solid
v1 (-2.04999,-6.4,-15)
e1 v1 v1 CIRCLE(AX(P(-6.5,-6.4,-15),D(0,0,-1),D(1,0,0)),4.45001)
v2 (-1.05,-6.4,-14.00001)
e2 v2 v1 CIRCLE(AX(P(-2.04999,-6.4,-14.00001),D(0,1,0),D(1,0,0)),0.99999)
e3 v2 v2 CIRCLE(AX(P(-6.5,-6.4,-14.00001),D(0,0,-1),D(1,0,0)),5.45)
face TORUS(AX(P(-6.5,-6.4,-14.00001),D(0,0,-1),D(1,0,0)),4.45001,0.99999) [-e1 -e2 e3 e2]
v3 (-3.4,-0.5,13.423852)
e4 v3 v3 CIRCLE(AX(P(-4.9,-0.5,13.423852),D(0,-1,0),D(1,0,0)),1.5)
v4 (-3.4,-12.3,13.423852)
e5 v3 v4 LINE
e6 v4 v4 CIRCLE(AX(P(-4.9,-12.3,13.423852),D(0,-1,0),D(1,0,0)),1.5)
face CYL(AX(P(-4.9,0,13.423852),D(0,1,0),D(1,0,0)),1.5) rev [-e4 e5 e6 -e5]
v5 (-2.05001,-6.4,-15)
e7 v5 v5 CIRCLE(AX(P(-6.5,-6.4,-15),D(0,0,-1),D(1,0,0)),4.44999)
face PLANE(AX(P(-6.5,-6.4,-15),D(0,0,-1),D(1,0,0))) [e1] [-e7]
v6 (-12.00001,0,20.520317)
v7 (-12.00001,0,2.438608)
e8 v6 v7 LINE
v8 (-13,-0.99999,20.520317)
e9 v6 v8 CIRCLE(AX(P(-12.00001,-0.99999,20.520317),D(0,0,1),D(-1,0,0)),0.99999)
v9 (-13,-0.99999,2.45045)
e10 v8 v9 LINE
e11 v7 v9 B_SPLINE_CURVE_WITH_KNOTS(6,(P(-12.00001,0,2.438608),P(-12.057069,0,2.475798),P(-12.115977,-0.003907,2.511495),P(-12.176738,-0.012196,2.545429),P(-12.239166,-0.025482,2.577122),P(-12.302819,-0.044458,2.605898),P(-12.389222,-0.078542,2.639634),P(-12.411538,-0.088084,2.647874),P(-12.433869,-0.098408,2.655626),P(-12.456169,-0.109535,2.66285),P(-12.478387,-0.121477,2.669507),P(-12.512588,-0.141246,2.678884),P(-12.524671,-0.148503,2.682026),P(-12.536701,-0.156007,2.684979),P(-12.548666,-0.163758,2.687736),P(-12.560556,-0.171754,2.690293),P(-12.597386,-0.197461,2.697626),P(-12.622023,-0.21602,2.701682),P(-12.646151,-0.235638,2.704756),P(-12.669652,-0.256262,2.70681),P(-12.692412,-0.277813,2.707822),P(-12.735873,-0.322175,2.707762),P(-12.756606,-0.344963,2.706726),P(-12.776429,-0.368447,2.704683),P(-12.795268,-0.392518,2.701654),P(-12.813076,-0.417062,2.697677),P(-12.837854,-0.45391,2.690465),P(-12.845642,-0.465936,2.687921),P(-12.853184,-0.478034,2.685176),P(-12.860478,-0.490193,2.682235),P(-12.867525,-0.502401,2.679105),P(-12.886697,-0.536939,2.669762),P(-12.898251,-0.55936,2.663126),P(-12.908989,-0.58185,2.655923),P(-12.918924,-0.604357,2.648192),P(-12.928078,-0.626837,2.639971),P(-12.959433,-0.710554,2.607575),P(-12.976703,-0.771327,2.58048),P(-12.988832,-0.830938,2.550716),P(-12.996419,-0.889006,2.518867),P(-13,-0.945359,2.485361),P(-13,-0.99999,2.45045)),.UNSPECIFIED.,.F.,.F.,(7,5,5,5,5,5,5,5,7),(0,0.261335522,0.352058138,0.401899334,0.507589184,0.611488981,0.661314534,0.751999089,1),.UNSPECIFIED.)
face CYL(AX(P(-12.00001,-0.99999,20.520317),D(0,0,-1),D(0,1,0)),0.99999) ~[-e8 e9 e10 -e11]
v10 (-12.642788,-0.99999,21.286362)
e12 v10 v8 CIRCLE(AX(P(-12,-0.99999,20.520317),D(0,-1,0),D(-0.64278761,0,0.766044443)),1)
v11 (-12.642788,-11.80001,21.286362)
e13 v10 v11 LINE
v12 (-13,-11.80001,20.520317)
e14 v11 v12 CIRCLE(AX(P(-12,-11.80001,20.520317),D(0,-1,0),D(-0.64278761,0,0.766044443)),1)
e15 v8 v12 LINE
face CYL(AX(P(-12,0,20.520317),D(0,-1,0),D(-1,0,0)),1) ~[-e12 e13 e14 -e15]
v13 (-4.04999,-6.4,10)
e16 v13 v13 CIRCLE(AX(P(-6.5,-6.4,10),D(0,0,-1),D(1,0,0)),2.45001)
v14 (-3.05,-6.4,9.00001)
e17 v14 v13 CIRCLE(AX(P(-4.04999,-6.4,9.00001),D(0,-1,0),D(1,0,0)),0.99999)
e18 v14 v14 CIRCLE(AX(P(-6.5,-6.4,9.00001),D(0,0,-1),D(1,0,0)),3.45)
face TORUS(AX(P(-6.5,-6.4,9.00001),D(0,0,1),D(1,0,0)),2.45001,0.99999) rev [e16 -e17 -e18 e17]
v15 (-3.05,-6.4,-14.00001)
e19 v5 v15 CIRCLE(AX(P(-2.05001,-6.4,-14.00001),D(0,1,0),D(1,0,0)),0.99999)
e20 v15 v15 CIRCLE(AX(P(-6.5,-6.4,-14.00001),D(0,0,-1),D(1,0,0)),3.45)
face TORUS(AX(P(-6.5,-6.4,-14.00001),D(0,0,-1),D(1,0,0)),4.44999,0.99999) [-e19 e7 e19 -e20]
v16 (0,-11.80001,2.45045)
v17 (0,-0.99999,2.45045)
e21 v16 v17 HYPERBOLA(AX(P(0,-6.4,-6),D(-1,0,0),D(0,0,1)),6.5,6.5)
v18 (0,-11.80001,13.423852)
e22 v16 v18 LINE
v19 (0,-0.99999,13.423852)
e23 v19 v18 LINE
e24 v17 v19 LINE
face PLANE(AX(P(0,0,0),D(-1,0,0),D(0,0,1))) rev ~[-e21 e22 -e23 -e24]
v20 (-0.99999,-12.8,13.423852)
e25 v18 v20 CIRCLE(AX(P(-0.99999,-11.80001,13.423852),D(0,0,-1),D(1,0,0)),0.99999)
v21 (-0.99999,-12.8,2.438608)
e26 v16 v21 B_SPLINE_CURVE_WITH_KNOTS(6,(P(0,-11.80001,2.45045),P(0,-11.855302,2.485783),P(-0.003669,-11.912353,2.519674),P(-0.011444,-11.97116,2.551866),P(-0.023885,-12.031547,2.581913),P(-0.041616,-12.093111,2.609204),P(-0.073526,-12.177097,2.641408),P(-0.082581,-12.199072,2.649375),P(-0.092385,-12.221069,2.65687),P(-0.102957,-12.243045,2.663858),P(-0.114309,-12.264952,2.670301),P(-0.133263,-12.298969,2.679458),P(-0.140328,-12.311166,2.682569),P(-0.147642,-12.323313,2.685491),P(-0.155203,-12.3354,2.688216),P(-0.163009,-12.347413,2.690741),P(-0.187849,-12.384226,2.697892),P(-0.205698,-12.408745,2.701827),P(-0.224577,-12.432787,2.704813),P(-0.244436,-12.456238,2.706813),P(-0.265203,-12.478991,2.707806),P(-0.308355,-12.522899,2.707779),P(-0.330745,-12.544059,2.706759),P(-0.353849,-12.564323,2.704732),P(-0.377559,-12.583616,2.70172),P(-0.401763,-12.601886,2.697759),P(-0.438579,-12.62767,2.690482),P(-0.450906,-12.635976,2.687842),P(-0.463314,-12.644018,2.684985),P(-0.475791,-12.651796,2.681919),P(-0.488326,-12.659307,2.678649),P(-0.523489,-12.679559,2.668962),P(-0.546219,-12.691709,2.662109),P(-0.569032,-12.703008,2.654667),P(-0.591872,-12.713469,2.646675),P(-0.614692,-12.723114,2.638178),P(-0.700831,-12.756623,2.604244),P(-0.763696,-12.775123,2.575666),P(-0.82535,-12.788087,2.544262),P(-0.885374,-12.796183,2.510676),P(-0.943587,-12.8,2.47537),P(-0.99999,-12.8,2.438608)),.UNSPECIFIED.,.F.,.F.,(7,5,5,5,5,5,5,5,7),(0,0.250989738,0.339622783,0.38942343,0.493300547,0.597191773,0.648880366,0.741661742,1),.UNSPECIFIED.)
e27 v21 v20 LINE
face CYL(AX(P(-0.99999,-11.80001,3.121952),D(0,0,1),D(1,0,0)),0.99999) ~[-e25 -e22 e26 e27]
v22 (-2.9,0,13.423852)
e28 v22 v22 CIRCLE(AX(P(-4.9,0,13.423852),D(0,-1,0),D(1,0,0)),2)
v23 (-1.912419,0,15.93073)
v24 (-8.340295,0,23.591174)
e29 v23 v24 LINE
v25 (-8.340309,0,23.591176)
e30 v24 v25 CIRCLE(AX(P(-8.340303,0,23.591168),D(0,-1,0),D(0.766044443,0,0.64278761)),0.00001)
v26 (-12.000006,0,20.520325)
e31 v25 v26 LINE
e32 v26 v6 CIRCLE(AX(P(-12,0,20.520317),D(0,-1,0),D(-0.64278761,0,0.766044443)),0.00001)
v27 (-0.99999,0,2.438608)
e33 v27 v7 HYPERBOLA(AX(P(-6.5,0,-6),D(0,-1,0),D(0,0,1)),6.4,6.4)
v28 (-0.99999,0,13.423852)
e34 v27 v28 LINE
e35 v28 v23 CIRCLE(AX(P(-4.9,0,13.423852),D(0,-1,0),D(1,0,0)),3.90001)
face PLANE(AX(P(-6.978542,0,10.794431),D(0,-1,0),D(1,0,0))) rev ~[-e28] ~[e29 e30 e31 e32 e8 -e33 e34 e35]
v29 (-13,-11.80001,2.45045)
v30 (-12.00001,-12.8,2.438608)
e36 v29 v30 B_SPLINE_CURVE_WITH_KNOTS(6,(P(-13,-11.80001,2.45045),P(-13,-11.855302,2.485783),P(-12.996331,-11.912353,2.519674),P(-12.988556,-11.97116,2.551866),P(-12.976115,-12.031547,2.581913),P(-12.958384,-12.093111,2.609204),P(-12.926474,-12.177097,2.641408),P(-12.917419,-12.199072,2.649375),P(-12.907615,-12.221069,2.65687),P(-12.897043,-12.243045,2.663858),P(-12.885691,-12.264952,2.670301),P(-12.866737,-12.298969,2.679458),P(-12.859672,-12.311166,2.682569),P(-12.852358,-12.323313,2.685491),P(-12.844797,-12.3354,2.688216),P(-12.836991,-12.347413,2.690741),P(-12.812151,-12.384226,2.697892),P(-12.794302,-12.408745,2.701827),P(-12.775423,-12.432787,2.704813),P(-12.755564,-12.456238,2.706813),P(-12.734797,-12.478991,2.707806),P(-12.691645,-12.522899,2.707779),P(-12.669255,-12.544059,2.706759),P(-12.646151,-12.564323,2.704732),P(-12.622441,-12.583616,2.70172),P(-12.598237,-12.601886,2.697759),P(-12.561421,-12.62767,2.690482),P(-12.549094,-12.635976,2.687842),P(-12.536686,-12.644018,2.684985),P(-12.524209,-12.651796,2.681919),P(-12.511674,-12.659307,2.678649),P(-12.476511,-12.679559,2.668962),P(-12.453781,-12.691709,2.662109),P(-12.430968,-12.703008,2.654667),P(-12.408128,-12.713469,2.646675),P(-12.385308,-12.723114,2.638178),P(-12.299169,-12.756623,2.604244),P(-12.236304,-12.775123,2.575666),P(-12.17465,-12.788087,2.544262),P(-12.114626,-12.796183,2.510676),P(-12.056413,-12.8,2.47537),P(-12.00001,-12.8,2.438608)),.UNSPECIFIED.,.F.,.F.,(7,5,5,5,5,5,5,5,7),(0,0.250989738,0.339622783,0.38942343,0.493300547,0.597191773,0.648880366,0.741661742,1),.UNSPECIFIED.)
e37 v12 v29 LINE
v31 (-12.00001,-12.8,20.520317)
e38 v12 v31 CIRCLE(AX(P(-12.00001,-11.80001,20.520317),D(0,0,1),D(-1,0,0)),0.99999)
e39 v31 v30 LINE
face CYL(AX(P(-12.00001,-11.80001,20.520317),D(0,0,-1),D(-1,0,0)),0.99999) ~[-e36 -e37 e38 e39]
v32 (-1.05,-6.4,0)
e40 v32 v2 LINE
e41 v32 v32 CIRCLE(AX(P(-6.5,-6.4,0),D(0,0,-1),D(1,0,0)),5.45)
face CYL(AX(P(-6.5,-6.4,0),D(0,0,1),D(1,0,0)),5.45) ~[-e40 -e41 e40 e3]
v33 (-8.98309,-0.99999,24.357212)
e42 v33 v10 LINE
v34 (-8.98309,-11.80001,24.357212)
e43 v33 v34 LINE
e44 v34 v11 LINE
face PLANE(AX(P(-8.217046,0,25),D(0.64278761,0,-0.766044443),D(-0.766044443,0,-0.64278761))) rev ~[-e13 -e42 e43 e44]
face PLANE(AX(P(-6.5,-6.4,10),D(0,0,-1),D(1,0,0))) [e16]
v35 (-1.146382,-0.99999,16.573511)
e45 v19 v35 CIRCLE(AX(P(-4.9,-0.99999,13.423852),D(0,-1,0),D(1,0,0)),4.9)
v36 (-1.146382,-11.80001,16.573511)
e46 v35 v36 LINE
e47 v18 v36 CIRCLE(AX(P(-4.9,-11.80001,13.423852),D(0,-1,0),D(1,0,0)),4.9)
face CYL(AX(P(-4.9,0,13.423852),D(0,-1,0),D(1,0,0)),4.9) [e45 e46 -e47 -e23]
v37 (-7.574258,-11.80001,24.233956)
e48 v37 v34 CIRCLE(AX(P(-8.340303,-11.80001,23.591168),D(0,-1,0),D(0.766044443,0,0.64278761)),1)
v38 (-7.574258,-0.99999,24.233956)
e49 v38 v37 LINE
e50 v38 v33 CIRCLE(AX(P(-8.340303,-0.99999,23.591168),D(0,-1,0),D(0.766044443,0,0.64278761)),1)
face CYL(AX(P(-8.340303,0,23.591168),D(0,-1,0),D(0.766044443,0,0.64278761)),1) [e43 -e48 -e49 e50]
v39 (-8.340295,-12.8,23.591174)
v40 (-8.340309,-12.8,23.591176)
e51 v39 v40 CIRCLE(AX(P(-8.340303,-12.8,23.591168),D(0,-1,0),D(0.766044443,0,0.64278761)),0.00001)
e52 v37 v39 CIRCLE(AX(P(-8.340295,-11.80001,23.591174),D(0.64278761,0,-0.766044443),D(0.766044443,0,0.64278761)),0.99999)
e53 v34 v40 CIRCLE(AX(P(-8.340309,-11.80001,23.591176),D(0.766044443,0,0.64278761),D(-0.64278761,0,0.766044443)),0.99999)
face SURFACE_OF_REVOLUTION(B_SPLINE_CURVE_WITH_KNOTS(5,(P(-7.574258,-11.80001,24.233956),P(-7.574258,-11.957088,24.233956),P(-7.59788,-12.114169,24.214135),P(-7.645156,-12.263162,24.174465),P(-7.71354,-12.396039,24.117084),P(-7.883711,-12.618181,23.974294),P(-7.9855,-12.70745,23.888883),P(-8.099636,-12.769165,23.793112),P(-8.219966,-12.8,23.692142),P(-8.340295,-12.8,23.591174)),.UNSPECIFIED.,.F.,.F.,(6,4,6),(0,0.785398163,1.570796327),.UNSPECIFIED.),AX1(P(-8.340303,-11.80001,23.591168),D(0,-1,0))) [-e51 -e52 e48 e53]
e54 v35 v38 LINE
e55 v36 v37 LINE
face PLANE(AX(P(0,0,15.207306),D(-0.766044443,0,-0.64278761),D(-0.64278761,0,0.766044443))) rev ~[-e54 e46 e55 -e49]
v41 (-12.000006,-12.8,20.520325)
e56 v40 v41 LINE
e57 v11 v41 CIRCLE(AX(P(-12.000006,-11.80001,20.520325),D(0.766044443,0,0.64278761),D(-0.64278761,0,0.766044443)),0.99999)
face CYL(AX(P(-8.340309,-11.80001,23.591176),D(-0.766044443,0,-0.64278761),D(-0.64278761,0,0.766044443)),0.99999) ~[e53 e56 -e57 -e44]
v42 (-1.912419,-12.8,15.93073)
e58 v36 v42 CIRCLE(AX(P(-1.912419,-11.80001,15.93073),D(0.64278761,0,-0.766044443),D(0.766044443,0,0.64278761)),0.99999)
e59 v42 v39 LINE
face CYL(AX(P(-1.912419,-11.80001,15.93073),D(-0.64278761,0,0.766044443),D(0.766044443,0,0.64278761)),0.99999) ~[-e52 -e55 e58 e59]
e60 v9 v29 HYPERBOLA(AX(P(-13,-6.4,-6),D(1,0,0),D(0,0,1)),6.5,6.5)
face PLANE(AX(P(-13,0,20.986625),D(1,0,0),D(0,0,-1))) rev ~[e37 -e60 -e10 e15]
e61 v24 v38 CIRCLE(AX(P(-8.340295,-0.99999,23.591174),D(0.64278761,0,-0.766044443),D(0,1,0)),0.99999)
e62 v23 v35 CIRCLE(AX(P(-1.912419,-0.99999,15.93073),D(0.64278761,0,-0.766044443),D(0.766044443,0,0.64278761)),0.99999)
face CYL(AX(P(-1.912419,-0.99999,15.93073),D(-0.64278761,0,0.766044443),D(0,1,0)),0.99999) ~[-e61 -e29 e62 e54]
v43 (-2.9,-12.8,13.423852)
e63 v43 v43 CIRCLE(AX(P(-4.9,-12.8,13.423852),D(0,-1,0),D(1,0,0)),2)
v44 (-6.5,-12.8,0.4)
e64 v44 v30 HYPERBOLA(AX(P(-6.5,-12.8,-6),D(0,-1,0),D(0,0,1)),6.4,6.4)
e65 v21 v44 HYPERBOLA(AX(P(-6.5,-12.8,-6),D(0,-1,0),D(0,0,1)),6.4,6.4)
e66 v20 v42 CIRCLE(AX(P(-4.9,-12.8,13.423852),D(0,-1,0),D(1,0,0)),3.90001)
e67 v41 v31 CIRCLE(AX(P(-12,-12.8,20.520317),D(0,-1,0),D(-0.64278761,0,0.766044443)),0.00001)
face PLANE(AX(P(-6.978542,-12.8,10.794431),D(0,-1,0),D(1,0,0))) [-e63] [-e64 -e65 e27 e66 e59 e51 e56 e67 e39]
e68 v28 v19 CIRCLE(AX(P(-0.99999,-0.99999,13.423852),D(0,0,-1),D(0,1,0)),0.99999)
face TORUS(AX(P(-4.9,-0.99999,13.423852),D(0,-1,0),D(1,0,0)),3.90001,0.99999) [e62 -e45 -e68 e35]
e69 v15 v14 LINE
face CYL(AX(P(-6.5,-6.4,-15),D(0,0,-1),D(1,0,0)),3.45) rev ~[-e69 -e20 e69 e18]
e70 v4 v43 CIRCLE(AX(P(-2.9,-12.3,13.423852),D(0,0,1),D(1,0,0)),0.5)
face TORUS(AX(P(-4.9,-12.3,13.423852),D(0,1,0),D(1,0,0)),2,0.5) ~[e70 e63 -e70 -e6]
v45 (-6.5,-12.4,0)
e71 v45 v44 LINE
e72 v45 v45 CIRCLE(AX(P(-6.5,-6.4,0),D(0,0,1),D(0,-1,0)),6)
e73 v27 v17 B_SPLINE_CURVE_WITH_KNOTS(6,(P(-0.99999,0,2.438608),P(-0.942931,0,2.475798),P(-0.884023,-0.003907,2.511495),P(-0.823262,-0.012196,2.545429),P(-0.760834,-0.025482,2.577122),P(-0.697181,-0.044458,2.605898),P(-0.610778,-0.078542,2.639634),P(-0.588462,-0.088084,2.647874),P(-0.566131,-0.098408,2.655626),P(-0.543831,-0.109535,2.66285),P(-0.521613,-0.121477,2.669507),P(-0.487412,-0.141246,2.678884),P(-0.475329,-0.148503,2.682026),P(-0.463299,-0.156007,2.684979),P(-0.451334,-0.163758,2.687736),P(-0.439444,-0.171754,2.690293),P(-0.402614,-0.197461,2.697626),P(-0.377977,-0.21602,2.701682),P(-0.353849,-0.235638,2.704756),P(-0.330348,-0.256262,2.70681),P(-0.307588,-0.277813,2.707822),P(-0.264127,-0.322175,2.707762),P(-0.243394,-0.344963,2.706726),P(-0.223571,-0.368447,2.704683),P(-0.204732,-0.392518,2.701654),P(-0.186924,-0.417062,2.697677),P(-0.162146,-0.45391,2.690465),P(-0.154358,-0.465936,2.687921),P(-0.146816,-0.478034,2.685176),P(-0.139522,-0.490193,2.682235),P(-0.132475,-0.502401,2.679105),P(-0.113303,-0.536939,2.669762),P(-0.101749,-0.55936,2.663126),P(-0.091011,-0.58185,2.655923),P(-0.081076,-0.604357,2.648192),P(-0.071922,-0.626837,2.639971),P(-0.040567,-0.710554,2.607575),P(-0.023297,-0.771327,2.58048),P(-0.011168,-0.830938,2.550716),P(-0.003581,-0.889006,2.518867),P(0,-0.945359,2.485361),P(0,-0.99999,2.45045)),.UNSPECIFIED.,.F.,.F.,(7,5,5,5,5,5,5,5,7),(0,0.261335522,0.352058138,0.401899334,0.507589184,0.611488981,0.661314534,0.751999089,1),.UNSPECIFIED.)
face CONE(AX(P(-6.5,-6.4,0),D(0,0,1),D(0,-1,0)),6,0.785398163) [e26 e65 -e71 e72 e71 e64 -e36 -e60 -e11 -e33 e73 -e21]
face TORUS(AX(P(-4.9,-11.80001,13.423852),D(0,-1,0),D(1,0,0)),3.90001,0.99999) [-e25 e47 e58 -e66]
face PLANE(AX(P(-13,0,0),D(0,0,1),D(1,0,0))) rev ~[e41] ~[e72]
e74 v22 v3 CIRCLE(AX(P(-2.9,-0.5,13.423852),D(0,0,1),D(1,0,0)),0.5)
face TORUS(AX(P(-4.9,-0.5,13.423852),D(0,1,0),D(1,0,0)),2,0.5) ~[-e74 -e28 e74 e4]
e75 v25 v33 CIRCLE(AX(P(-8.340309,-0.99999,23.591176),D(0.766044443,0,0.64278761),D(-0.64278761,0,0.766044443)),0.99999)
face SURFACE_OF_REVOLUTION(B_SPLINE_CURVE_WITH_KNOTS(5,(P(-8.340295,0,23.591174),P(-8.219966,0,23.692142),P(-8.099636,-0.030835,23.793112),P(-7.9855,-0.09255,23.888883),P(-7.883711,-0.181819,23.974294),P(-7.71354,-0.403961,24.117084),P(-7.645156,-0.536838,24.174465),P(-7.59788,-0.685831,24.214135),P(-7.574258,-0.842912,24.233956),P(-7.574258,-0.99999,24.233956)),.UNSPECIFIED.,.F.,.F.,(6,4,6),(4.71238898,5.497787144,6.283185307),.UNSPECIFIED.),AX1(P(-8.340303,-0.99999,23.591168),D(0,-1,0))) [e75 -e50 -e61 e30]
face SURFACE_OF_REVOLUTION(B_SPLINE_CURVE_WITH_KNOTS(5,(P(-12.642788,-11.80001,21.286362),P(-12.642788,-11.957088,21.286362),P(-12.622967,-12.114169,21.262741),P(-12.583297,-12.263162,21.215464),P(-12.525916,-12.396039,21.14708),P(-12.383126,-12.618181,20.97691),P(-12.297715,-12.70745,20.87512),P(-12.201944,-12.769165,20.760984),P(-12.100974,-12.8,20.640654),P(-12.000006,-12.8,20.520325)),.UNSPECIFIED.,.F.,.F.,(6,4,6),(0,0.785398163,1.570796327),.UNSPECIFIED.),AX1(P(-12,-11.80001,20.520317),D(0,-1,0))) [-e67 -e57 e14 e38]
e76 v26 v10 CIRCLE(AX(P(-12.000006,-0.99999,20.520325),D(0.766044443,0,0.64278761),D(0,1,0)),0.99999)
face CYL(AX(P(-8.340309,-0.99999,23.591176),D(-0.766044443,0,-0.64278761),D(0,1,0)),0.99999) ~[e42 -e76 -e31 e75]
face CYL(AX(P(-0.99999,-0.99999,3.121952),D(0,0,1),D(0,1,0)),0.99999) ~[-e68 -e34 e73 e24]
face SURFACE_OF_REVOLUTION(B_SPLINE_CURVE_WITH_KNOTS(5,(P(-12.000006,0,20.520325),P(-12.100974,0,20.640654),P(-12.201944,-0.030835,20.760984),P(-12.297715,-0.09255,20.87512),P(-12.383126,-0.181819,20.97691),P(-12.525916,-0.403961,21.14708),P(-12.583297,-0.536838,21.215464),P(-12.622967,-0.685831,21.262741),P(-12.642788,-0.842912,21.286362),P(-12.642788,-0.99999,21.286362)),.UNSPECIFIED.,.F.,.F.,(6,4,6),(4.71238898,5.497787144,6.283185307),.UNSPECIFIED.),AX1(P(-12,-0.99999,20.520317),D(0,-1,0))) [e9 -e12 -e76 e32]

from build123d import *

# Parameters (mm, degrees)
F0_R      = 1.5
F1_DEPTH  = 12.8
F2_R      = 4.9
F3_R      = 1
F4_R      = 5.45
F5_DEPTH  = 15
F9_R      = 3.45
F10_DEPTH = 25
F11_R     = 0.99999
F12_R     = 0.5


# Not quite as in the source:
# - a fillet or chamfer is up to 0.001 mm smaller than in the source, because OpenCascade refuses the exact size


with BuildPart() as f1:
    # F0 (on Front) → F1 (new body)
    with BuildSketch(Plane.XZ):
        Polygon((-13, 0), (0, 0), (0, 15.2073059861), (-8.2170459353, 25), (-13, 20.9866250083), align=None)
        with Locations((-4.9, 13.4238518382)):
            Circle(F0_R, mode=Mode.SUBTRACT)
    extrude(amount=F1_DEPTH)

    # F2
    f2_edges = [f1.edges().sort_by_distance(p)[0] for p in [
        (0, -6.4, 15.207306),
    ]]
    fillet(f2_edges, radius=F2_R)

    # F3
    f3_edges = [f1.edges().sort_by_distance(p)[0] for p in [
        (-8.217046, -6.4, 25),
        (-13, -6.4, 20.986625),
    ]]
    fillet(f3_edges, radius=F3_R)

    # F4 (on face) → F5 (join)
    with BuildSketch(Plane(origin=(0, 0, 0), x_dir=(1, 0, 0), z_dir=(0, 0, -1))):
        with Locations((-6.5, 6.4)):
            Circle(F4_R)
    extrude(amount=F5_DEPTH)

    # F7 (on offset) → F8 (revolve, cut)
    with BuildSketch(Plane.YZ.offset(-6.5)):
        Polygon((-17.4, 0), (-12.4, 0), (-17.4, 5), align=None)
    revolve(axis=Axis((-6.5, -6.4, -7.3510144139), (0, 0, 1)), mode=Mode.SUBTRACT)

    # F9 (on face) → F10 (cut)
    with BuildSketch(Plane(origin=(0, 0, -15), x_dir=(1, 0, 0), z_dir=(0, 0, -1))):
        with Locations((-6.5, 6.4)):
            Circle(F9_R)
    extrude(amount=-F10_DEPTH, mode=Mode.SUBTRACT)

    # F11 (radius 1 in the source; OpenCascade refuses exactly that, so slightly less here)
    f11_edges = [f1.edges().sort_by_distance(p)[0] for p in [
        (-11.95, -6.4, -15),
        (-9.95, -6.4, -15),
        (-13, 0, 11.821134),
        (0, -12.8, 8.272902),
        (-9.95, -6.4, 10),
    ]]
    fillet(f11_edges, radius=F11_R)

    # F12
    f12_edges = [f1.edges().sort_by_distance(p)[0] for p in [
        (-6.4, -12.8, 13.423852),
        (-6.4, 0, 13.423852),
    ]]
    fillet(f12_edges, radius=F12_R)


solid = f1.part
